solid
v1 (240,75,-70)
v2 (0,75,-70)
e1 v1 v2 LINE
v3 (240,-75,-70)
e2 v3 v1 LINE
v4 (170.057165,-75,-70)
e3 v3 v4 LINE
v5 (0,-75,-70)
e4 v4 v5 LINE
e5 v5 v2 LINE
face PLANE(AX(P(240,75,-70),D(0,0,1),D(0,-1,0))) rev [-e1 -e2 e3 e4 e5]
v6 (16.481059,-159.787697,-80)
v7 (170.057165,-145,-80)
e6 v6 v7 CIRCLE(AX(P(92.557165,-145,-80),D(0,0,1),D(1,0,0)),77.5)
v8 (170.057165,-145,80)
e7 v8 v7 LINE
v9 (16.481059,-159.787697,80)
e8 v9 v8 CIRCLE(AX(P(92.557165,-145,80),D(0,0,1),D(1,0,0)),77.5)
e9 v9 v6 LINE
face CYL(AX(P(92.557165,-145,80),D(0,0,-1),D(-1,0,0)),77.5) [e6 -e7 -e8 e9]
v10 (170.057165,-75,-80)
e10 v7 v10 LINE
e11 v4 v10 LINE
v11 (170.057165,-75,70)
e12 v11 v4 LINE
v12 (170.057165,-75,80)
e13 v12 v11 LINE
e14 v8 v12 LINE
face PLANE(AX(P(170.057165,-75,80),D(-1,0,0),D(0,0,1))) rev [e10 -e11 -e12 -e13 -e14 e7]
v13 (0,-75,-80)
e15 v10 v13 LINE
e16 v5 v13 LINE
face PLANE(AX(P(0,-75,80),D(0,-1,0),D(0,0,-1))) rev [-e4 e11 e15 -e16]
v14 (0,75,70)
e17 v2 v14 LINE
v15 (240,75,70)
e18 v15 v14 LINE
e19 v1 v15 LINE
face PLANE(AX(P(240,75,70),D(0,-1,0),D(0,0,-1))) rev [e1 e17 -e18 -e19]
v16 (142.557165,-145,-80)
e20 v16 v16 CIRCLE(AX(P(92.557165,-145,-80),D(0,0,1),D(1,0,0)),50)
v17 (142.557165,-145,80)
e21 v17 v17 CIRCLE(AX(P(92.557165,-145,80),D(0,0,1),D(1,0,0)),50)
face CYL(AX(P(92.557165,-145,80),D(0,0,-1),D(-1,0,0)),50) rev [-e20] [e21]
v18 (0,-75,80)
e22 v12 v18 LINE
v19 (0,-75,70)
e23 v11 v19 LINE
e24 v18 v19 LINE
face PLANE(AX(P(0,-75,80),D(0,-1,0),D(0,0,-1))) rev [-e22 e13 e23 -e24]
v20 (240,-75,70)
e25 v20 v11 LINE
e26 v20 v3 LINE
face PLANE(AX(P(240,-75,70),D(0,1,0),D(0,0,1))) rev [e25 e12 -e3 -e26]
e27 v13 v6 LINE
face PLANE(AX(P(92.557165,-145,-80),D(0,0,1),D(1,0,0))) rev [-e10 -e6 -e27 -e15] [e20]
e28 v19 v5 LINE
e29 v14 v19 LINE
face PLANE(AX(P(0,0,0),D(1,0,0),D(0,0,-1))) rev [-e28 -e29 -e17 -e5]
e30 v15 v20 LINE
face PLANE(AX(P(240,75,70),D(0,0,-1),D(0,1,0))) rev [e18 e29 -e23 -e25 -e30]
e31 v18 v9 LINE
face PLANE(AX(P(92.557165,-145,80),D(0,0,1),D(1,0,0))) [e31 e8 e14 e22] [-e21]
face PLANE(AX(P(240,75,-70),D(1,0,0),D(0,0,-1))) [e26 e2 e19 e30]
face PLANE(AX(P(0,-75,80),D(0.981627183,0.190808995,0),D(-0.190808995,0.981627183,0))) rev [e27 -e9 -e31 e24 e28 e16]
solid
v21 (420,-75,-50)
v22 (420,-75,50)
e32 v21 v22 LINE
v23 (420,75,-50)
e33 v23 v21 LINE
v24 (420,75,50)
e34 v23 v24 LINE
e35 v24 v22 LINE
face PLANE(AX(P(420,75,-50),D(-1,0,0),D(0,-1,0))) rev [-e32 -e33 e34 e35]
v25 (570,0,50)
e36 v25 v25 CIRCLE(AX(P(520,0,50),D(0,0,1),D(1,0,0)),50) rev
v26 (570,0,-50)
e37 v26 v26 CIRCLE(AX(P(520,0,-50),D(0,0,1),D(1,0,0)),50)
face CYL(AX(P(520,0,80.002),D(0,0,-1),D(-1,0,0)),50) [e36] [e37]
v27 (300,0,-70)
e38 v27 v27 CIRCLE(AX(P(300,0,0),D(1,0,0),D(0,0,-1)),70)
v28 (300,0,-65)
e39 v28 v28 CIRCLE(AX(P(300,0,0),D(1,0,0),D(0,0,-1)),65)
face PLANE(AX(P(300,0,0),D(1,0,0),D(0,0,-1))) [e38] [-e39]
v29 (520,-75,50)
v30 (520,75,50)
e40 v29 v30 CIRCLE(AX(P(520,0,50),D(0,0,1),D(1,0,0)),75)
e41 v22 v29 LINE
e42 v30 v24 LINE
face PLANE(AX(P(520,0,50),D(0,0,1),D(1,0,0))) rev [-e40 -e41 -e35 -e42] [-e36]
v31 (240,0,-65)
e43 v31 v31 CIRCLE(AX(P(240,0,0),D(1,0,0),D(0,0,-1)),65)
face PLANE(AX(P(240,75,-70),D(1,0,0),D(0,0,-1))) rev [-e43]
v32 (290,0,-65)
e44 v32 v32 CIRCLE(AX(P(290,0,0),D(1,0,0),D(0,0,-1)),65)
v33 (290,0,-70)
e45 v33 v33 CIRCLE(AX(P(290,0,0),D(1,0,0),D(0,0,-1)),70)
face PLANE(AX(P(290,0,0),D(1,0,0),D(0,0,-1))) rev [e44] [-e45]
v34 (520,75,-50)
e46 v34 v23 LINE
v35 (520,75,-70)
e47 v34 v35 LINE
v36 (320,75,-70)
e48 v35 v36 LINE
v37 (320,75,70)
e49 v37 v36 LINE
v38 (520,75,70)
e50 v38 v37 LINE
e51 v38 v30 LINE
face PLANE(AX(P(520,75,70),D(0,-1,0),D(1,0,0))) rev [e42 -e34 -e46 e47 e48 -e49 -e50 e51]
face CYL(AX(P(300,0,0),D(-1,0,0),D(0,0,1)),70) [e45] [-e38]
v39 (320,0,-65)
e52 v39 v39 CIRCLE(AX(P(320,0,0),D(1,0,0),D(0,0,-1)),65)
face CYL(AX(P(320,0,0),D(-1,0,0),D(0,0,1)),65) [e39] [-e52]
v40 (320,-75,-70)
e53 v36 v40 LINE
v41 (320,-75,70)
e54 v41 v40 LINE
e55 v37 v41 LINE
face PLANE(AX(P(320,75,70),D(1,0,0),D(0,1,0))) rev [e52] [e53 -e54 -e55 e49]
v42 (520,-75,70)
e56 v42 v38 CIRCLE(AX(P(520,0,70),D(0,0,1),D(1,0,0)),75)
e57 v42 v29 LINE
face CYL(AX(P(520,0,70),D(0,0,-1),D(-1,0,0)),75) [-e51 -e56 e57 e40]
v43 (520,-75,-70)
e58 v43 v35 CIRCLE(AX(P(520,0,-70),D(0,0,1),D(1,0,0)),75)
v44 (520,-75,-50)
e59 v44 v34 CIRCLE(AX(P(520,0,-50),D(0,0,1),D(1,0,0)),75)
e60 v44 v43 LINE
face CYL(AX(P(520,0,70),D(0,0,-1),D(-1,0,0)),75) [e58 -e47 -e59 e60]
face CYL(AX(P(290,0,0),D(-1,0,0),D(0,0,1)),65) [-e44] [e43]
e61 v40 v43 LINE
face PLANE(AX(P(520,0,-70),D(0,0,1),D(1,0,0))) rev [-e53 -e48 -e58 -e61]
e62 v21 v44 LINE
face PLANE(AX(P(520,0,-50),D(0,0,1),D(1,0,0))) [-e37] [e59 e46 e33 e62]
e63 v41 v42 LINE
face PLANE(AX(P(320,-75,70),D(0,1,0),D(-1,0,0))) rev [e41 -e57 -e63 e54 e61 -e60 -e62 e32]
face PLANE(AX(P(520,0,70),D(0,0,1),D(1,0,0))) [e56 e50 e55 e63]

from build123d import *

# Parameters (mm, degrees)
SKETCH1_W           = 140
SKETCH1_H           = 150
BOSS_EXTRUDE1_DEPTH = 240
SKETCH2_R           = 65
BOSS_EXTRUDE2_DEPTH = 50
SKETCH3_R           = 70
BOSS_EXTRUDE3_DEPTH = 10
SKETCH4_R           = 50
BOSS_EXTRUDE4_DEPTH = 80
SKETCH5_R           = 65
BOSS_EXTRUDE5_DEPTH = 20
BOSS_EXTRUDE6_DEPTH = 70
CUT_EXTRUDE1_DEPTH  = 50
BOSS_EXTRUDE7_REACH = 650.407
SKETCH8_R           = 50


with BuildPart() as part:
    # Sketch1 → Boss-Extrude1 (new body)
    with BuildSketch(Plane(origin=(0, 0, 0), x_dir=(0, 0, -1), z_dir=(1, 0, 0))):
        Rectangle(SKETCH1_W, SKETCH1_H)
    extrude(amount=BOSS_EXTRUDE1_DEPTH)

    # Sketch2 → Boss-Extrude2 (add)
    with BuildSketch(Plane(origin=(240, 0, 0), x_dir=(0, 0, -1), z_dir=(1, 0, 0))):
        Circle(SKETCH2_R)
    extrude(amount=BOSS_EXTRUDE2_DEPTH)

    # Sketch3 → Boss-Extrude3 (add)
    with BuildSketch(Plane(origin=(290, 0, 0), x_dir=(0, 0, -1), z_dir=(1, 0, 0))):
        Circle(SKETCH3_R)
    extrude(amount=BOSS_EXTRUDE3_DEPTH)

    # Sketch4 → Boss-Extrude4 (add, symmetric)
    with BuildSketch(Plane.XY):
        with BuildLine():
            Line((0, -75), (16.481058781, -159.787697142))
            ThreePointArc((16.481058781, -159.787697142), (99.985211319, -222.143205373), (170.057165499, -145))
            Line((170.057165499, -145), (170.057165499, -75))
            Line((170.057165499, -75), (0, -75))
        make_face()
        with Locations((92.557165499, -145)):
            Circle(SKETCH4_R, mode=Mode.SUBTRACT)
    extrude(amount=BOSS_EXTRUDE4_DEPTH, both=True)

    # Sketch5 → Boss-Extrude5 (add)
    with BuildSketch(Plane(origin=(300, 0, 0), x_dir=(0, 0, -1), z_dir=(1, 0, 0))):
        Circle(SKETCH5_R)
    extrude(amount=BOSS_EXTRUDE5_DEPTH)

    # Sketch6 → Boss-Extrude6 (add, symmetric)
    with BuildSketch(Plane.XY):
        with BuildLine():
            Line((520, 75), (320, 75))
            Line((320, 75), (320, -75))
            Line((320, -75), (520, -75))
            ThreePointArc((520, -75), (595, 0), (520, 75))
        make_face()
    extrude(amount=BOSS_EXTRUDE6_DEPTH, both=True)

    # Sketch7 → Cut-Extrude1 (cut, symmetric)
    with BuildSketch(Plane.XY):
        with BuildLine():
            Line((520, 75), (420, 75))
            Line((420, 75), (420, -75))
            Line((420, -75), (520, -75))
            ThreePointArc((520, -75), (595, 0), (520, 75))
        make_face()
    extrude(amount=CUT_EXTRUDE1_DEPTH, both=True, mode=Mode.SUBTRACT)

    # Sketch8 → Boss-Extrude7 (add, up to next)
    with BuildSketch(Plane.XY.offset(-50), mode=Mode.PRIVATE) as boss_extrude7_sk1:
        with Locations((520, 0)):
            Circle(SKETCH8_R)
    boss_extrude7_tool1 = extrude(boss_extrude7_sk1.sketch, amount=BOSS_EXTRUDE7_REACH, mode=Mode.PRIVATE) - part.part
    add(boss_extrude7_tool1.solids().sort_by_distance((520, 0, -50))[0])


with BuildPart() as body_2:
    # Split1: the piece on the far side of the plane
    add(part.part)
    split(bisect_by=Plane(origin=(240, 0, 0), x_dir=(0, 0, 1), z_dir=(1, 0, 0)), keep=Keep.BOTTOM)


with BuildPart() as part_1:
    add(part.part)

    # Split1
    split(bisect_by=Plane(origin=(240, 0, 0), x_dir=(0, 0, 1), z_dir=(1, 0, 0)), keep=Keep.TOP)


solid = Compound([body_2.part, part_1.part])
